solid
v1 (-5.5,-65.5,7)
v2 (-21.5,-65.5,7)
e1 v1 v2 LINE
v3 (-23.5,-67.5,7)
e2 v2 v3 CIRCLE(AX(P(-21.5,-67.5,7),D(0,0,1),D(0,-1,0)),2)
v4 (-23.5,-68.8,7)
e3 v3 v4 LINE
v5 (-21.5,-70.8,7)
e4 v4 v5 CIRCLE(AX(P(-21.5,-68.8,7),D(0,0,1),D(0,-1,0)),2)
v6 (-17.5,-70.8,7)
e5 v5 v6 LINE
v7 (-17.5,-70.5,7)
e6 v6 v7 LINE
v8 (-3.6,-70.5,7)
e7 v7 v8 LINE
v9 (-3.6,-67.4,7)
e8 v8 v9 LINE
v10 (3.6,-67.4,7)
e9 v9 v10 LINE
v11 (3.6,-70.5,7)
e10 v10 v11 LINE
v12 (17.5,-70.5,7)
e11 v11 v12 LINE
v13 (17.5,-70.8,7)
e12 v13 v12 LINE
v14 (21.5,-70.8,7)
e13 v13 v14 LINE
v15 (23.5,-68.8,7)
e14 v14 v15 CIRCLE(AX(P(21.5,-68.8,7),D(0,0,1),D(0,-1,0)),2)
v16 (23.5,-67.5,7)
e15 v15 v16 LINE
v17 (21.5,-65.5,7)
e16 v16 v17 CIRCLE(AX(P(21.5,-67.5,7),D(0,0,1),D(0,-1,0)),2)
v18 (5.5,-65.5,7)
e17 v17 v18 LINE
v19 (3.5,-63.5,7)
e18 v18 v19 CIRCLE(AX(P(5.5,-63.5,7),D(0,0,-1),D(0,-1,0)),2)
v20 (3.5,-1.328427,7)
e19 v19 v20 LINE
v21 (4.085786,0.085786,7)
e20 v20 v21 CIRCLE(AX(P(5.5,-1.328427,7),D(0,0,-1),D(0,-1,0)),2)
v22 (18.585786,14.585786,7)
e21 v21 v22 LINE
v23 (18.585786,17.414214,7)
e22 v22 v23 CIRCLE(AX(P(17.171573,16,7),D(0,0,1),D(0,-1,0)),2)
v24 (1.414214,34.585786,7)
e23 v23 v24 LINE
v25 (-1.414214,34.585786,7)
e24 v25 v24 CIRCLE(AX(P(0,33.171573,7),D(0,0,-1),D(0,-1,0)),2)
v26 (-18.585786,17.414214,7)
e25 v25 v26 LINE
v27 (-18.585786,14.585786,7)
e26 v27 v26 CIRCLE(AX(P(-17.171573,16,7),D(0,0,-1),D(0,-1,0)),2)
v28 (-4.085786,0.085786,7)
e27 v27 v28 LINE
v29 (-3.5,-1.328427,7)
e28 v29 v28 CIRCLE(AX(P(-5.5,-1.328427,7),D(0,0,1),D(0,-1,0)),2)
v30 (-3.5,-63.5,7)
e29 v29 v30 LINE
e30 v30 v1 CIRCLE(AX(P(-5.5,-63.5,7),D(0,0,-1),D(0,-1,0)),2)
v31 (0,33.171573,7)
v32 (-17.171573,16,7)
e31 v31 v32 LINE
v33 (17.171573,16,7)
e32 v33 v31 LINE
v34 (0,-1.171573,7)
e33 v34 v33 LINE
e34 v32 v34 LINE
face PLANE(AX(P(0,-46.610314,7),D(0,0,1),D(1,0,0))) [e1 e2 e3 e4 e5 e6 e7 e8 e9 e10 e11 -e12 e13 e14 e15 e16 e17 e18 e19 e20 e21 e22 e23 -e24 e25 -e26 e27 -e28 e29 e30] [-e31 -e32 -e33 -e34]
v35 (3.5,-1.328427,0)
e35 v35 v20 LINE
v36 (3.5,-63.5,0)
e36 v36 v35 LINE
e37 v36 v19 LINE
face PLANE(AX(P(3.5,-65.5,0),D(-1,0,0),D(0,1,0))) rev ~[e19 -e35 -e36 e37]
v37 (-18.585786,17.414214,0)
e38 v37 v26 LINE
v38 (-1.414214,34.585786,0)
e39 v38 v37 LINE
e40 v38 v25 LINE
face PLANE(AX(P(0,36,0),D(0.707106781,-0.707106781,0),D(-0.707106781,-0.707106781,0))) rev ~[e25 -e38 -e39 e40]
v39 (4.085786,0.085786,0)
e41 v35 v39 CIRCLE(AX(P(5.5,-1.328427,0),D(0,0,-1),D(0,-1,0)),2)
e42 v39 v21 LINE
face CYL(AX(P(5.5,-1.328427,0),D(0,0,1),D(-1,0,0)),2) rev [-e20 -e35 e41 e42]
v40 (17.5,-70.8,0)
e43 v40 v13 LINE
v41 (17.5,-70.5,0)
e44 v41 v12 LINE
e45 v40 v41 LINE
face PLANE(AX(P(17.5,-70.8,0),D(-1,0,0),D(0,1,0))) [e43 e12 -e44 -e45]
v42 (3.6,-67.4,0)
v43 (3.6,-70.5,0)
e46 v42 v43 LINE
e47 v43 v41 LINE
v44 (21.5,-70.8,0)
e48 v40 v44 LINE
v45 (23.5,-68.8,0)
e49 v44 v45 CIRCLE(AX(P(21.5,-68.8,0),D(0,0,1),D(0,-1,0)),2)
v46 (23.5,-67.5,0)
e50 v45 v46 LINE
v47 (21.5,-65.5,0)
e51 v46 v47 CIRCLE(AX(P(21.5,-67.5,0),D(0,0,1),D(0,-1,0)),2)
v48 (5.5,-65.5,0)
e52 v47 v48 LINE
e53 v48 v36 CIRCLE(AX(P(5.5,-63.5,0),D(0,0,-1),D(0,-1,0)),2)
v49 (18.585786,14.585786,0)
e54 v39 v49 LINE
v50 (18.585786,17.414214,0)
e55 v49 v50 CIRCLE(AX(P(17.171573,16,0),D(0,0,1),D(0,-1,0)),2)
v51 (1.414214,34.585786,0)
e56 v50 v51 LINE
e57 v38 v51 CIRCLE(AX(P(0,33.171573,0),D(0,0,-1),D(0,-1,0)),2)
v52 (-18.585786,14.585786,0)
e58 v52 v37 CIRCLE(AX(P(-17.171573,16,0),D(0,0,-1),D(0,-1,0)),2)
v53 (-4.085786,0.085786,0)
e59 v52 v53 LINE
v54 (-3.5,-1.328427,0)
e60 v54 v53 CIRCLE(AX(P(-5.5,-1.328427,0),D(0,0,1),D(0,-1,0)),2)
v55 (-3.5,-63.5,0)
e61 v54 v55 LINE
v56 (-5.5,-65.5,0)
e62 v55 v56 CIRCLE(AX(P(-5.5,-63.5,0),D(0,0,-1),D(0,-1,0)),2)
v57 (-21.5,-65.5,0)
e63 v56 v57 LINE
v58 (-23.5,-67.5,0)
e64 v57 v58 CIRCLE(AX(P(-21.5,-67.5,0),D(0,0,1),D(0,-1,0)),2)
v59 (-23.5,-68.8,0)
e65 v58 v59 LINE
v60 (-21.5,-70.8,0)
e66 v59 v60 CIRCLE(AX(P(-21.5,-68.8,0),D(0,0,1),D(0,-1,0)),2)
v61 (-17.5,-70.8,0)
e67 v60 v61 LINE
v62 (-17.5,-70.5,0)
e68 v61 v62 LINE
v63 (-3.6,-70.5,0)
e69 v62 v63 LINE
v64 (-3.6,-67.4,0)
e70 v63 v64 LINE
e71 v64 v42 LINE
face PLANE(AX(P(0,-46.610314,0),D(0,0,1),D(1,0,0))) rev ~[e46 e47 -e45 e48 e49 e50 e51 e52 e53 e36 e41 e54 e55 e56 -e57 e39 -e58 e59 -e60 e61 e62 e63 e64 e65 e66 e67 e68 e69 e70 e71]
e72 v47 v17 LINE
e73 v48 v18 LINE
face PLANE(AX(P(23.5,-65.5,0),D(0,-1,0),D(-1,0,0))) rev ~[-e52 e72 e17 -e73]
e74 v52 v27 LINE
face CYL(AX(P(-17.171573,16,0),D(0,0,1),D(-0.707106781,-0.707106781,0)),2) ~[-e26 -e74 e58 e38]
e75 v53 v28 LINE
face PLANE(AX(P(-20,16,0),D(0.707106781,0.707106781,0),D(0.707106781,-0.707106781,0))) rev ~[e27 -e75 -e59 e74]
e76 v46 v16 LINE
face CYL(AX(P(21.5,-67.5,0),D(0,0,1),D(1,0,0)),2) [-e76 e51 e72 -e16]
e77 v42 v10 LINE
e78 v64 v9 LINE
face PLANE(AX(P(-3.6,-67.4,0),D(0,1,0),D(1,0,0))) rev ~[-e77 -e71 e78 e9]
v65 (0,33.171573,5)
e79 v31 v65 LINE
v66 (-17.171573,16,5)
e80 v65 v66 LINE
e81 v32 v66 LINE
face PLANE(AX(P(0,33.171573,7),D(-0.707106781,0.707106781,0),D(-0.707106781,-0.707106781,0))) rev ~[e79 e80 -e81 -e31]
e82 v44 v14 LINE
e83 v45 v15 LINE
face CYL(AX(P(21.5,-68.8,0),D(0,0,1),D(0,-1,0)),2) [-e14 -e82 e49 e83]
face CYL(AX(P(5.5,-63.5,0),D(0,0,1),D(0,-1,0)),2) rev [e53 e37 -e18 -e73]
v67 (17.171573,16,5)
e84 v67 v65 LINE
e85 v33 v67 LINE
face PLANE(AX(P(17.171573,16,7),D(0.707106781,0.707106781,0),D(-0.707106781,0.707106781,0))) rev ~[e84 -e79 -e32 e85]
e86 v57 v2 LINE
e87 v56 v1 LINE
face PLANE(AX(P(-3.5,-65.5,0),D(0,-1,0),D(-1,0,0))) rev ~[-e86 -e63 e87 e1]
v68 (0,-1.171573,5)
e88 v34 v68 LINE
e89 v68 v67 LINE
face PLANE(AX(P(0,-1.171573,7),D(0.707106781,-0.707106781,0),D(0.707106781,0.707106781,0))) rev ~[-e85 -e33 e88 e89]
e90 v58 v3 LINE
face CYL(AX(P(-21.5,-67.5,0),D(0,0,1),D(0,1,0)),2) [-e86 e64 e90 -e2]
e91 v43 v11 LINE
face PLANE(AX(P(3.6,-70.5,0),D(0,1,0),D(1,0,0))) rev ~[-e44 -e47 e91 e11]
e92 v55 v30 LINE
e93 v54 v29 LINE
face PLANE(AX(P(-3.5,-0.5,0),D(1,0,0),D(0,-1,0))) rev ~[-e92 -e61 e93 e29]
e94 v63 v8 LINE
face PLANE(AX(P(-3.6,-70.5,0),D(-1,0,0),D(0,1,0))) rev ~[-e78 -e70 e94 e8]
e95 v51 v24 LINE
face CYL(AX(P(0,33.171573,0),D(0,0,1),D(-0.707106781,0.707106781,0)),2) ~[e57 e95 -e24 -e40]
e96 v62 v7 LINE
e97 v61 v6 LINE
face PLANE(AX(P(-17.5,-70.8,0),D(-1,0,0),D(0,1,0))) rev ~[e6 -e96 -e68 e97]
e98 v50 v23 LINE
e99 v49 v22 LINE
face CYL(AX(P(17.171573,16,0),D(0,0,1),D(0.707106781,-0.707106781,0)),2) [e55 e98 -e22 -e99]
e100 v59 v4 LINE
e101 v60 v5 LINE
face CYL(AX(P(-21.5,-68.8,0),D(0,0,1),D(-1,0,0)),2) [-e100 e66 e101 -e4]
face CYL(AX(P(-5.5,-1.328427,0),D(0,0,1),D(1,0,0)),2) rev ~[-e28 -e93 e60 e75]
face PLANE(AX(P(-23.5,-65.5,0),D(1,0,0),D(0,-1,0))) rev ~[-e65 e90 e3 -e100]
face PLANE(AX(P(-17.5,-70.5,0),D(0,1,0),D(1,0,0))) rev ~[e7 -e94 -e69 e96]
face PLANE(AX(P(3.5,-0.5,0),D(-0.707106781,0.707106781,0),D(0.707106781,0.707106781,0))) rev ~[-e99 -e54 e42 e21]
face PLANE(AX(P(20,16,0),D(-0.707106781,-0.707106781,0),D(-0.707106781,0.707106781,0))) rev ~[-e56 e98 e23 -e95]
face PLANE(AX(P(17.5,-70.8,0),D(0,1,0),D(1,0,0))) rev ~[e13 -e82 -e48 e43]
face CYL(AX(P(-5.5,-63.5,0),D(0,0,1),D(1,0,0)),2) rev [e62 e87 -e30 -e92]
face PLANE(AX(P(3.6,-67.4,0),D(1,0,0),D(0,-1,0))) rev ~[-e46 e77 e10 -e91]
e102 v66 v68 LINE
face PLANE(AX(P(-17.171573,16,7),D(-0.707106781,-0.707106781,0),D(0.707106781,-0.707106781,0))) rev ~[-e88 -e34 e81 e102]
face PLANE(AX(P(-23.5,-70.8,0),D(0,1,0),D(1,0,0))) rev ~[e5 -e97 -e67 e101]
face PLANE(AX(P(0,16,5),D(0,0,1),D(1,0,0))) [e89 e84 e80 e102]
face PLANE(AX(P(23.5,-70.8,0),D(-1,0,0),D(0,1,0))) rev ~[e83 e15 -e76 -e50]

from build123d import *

# Parameters (mm, degrees)
F0_W     = 6
F0_H     = 0.3
F1_DEPTH = 7
F3_DEPTH = 2
F4_R     = 2


# Not quite as in the source:
# - a feature names something its author has since deleted; it is built from what else it names


with BuildPart() as f1:
    # F0 (on Top) → F1 (new body)
    with BuildSketch(Plane.XY):
        Polygon((0, -4), (-3.5, -0.5), (-3.5, -65.5), (-23.5, -65.5), (-23.5, -70.5), (-17.5, -70.5), (-3.6, -70.5), (-3.6, -67.4), (3.6, -67.4), (3.6, -70.5), (17.5, -70.5), (23.5, -70.5), (23.5, -65.5), (3.5, -65.5), (3.5, -0.5), align=None)
        with Locations((-20.5, -70.65)):
            Rectangle(F0_W, F0_H)
        with Locations((20.5, -70.65)):
            Rectangle(F0_W, F0_H)
        Polygon((-20, 16), (-3.5, -0.5), (0, -4), (3.5, -0.5), (20, 16), (0, 36), align=None)
    extrude(amount=F1_DEPTH)

    # F2 (on face) → F3 (cut)
    with BuildSketch(Plane.XY.offset(7)):
        Polygon((0, 33.1715728753), (-17.1715728753, 16), (0, -1.1715728753), (17.1715728753, 16), align=None)
    extrude(amount=-F3_DEPTH, mode=Mode.SUBTRACT)

    # F4
    f4_edges = [f1.edges().sort_by_distance(p)[0] for p in [
        (3.5, -65.5, 3.5),
        (-3.5, -65.5, 3.5),
        (-23.5, -65.5, 3.5),
        (23.5, -65.5, 3.5),
        (-23.5, -70.8, 3.5),
        (23.5, -70.8, 3.5),
        (20, 16, 3.5),
        (0, 36, 3.5),
        (-20, 16, 3.5),
        (3.5, -0.5, 3.5),
        (-3.5, -0.5, 3.5),
    ]]
    fillet(f4_edges, radius=F4_R)


solid = f1.part
